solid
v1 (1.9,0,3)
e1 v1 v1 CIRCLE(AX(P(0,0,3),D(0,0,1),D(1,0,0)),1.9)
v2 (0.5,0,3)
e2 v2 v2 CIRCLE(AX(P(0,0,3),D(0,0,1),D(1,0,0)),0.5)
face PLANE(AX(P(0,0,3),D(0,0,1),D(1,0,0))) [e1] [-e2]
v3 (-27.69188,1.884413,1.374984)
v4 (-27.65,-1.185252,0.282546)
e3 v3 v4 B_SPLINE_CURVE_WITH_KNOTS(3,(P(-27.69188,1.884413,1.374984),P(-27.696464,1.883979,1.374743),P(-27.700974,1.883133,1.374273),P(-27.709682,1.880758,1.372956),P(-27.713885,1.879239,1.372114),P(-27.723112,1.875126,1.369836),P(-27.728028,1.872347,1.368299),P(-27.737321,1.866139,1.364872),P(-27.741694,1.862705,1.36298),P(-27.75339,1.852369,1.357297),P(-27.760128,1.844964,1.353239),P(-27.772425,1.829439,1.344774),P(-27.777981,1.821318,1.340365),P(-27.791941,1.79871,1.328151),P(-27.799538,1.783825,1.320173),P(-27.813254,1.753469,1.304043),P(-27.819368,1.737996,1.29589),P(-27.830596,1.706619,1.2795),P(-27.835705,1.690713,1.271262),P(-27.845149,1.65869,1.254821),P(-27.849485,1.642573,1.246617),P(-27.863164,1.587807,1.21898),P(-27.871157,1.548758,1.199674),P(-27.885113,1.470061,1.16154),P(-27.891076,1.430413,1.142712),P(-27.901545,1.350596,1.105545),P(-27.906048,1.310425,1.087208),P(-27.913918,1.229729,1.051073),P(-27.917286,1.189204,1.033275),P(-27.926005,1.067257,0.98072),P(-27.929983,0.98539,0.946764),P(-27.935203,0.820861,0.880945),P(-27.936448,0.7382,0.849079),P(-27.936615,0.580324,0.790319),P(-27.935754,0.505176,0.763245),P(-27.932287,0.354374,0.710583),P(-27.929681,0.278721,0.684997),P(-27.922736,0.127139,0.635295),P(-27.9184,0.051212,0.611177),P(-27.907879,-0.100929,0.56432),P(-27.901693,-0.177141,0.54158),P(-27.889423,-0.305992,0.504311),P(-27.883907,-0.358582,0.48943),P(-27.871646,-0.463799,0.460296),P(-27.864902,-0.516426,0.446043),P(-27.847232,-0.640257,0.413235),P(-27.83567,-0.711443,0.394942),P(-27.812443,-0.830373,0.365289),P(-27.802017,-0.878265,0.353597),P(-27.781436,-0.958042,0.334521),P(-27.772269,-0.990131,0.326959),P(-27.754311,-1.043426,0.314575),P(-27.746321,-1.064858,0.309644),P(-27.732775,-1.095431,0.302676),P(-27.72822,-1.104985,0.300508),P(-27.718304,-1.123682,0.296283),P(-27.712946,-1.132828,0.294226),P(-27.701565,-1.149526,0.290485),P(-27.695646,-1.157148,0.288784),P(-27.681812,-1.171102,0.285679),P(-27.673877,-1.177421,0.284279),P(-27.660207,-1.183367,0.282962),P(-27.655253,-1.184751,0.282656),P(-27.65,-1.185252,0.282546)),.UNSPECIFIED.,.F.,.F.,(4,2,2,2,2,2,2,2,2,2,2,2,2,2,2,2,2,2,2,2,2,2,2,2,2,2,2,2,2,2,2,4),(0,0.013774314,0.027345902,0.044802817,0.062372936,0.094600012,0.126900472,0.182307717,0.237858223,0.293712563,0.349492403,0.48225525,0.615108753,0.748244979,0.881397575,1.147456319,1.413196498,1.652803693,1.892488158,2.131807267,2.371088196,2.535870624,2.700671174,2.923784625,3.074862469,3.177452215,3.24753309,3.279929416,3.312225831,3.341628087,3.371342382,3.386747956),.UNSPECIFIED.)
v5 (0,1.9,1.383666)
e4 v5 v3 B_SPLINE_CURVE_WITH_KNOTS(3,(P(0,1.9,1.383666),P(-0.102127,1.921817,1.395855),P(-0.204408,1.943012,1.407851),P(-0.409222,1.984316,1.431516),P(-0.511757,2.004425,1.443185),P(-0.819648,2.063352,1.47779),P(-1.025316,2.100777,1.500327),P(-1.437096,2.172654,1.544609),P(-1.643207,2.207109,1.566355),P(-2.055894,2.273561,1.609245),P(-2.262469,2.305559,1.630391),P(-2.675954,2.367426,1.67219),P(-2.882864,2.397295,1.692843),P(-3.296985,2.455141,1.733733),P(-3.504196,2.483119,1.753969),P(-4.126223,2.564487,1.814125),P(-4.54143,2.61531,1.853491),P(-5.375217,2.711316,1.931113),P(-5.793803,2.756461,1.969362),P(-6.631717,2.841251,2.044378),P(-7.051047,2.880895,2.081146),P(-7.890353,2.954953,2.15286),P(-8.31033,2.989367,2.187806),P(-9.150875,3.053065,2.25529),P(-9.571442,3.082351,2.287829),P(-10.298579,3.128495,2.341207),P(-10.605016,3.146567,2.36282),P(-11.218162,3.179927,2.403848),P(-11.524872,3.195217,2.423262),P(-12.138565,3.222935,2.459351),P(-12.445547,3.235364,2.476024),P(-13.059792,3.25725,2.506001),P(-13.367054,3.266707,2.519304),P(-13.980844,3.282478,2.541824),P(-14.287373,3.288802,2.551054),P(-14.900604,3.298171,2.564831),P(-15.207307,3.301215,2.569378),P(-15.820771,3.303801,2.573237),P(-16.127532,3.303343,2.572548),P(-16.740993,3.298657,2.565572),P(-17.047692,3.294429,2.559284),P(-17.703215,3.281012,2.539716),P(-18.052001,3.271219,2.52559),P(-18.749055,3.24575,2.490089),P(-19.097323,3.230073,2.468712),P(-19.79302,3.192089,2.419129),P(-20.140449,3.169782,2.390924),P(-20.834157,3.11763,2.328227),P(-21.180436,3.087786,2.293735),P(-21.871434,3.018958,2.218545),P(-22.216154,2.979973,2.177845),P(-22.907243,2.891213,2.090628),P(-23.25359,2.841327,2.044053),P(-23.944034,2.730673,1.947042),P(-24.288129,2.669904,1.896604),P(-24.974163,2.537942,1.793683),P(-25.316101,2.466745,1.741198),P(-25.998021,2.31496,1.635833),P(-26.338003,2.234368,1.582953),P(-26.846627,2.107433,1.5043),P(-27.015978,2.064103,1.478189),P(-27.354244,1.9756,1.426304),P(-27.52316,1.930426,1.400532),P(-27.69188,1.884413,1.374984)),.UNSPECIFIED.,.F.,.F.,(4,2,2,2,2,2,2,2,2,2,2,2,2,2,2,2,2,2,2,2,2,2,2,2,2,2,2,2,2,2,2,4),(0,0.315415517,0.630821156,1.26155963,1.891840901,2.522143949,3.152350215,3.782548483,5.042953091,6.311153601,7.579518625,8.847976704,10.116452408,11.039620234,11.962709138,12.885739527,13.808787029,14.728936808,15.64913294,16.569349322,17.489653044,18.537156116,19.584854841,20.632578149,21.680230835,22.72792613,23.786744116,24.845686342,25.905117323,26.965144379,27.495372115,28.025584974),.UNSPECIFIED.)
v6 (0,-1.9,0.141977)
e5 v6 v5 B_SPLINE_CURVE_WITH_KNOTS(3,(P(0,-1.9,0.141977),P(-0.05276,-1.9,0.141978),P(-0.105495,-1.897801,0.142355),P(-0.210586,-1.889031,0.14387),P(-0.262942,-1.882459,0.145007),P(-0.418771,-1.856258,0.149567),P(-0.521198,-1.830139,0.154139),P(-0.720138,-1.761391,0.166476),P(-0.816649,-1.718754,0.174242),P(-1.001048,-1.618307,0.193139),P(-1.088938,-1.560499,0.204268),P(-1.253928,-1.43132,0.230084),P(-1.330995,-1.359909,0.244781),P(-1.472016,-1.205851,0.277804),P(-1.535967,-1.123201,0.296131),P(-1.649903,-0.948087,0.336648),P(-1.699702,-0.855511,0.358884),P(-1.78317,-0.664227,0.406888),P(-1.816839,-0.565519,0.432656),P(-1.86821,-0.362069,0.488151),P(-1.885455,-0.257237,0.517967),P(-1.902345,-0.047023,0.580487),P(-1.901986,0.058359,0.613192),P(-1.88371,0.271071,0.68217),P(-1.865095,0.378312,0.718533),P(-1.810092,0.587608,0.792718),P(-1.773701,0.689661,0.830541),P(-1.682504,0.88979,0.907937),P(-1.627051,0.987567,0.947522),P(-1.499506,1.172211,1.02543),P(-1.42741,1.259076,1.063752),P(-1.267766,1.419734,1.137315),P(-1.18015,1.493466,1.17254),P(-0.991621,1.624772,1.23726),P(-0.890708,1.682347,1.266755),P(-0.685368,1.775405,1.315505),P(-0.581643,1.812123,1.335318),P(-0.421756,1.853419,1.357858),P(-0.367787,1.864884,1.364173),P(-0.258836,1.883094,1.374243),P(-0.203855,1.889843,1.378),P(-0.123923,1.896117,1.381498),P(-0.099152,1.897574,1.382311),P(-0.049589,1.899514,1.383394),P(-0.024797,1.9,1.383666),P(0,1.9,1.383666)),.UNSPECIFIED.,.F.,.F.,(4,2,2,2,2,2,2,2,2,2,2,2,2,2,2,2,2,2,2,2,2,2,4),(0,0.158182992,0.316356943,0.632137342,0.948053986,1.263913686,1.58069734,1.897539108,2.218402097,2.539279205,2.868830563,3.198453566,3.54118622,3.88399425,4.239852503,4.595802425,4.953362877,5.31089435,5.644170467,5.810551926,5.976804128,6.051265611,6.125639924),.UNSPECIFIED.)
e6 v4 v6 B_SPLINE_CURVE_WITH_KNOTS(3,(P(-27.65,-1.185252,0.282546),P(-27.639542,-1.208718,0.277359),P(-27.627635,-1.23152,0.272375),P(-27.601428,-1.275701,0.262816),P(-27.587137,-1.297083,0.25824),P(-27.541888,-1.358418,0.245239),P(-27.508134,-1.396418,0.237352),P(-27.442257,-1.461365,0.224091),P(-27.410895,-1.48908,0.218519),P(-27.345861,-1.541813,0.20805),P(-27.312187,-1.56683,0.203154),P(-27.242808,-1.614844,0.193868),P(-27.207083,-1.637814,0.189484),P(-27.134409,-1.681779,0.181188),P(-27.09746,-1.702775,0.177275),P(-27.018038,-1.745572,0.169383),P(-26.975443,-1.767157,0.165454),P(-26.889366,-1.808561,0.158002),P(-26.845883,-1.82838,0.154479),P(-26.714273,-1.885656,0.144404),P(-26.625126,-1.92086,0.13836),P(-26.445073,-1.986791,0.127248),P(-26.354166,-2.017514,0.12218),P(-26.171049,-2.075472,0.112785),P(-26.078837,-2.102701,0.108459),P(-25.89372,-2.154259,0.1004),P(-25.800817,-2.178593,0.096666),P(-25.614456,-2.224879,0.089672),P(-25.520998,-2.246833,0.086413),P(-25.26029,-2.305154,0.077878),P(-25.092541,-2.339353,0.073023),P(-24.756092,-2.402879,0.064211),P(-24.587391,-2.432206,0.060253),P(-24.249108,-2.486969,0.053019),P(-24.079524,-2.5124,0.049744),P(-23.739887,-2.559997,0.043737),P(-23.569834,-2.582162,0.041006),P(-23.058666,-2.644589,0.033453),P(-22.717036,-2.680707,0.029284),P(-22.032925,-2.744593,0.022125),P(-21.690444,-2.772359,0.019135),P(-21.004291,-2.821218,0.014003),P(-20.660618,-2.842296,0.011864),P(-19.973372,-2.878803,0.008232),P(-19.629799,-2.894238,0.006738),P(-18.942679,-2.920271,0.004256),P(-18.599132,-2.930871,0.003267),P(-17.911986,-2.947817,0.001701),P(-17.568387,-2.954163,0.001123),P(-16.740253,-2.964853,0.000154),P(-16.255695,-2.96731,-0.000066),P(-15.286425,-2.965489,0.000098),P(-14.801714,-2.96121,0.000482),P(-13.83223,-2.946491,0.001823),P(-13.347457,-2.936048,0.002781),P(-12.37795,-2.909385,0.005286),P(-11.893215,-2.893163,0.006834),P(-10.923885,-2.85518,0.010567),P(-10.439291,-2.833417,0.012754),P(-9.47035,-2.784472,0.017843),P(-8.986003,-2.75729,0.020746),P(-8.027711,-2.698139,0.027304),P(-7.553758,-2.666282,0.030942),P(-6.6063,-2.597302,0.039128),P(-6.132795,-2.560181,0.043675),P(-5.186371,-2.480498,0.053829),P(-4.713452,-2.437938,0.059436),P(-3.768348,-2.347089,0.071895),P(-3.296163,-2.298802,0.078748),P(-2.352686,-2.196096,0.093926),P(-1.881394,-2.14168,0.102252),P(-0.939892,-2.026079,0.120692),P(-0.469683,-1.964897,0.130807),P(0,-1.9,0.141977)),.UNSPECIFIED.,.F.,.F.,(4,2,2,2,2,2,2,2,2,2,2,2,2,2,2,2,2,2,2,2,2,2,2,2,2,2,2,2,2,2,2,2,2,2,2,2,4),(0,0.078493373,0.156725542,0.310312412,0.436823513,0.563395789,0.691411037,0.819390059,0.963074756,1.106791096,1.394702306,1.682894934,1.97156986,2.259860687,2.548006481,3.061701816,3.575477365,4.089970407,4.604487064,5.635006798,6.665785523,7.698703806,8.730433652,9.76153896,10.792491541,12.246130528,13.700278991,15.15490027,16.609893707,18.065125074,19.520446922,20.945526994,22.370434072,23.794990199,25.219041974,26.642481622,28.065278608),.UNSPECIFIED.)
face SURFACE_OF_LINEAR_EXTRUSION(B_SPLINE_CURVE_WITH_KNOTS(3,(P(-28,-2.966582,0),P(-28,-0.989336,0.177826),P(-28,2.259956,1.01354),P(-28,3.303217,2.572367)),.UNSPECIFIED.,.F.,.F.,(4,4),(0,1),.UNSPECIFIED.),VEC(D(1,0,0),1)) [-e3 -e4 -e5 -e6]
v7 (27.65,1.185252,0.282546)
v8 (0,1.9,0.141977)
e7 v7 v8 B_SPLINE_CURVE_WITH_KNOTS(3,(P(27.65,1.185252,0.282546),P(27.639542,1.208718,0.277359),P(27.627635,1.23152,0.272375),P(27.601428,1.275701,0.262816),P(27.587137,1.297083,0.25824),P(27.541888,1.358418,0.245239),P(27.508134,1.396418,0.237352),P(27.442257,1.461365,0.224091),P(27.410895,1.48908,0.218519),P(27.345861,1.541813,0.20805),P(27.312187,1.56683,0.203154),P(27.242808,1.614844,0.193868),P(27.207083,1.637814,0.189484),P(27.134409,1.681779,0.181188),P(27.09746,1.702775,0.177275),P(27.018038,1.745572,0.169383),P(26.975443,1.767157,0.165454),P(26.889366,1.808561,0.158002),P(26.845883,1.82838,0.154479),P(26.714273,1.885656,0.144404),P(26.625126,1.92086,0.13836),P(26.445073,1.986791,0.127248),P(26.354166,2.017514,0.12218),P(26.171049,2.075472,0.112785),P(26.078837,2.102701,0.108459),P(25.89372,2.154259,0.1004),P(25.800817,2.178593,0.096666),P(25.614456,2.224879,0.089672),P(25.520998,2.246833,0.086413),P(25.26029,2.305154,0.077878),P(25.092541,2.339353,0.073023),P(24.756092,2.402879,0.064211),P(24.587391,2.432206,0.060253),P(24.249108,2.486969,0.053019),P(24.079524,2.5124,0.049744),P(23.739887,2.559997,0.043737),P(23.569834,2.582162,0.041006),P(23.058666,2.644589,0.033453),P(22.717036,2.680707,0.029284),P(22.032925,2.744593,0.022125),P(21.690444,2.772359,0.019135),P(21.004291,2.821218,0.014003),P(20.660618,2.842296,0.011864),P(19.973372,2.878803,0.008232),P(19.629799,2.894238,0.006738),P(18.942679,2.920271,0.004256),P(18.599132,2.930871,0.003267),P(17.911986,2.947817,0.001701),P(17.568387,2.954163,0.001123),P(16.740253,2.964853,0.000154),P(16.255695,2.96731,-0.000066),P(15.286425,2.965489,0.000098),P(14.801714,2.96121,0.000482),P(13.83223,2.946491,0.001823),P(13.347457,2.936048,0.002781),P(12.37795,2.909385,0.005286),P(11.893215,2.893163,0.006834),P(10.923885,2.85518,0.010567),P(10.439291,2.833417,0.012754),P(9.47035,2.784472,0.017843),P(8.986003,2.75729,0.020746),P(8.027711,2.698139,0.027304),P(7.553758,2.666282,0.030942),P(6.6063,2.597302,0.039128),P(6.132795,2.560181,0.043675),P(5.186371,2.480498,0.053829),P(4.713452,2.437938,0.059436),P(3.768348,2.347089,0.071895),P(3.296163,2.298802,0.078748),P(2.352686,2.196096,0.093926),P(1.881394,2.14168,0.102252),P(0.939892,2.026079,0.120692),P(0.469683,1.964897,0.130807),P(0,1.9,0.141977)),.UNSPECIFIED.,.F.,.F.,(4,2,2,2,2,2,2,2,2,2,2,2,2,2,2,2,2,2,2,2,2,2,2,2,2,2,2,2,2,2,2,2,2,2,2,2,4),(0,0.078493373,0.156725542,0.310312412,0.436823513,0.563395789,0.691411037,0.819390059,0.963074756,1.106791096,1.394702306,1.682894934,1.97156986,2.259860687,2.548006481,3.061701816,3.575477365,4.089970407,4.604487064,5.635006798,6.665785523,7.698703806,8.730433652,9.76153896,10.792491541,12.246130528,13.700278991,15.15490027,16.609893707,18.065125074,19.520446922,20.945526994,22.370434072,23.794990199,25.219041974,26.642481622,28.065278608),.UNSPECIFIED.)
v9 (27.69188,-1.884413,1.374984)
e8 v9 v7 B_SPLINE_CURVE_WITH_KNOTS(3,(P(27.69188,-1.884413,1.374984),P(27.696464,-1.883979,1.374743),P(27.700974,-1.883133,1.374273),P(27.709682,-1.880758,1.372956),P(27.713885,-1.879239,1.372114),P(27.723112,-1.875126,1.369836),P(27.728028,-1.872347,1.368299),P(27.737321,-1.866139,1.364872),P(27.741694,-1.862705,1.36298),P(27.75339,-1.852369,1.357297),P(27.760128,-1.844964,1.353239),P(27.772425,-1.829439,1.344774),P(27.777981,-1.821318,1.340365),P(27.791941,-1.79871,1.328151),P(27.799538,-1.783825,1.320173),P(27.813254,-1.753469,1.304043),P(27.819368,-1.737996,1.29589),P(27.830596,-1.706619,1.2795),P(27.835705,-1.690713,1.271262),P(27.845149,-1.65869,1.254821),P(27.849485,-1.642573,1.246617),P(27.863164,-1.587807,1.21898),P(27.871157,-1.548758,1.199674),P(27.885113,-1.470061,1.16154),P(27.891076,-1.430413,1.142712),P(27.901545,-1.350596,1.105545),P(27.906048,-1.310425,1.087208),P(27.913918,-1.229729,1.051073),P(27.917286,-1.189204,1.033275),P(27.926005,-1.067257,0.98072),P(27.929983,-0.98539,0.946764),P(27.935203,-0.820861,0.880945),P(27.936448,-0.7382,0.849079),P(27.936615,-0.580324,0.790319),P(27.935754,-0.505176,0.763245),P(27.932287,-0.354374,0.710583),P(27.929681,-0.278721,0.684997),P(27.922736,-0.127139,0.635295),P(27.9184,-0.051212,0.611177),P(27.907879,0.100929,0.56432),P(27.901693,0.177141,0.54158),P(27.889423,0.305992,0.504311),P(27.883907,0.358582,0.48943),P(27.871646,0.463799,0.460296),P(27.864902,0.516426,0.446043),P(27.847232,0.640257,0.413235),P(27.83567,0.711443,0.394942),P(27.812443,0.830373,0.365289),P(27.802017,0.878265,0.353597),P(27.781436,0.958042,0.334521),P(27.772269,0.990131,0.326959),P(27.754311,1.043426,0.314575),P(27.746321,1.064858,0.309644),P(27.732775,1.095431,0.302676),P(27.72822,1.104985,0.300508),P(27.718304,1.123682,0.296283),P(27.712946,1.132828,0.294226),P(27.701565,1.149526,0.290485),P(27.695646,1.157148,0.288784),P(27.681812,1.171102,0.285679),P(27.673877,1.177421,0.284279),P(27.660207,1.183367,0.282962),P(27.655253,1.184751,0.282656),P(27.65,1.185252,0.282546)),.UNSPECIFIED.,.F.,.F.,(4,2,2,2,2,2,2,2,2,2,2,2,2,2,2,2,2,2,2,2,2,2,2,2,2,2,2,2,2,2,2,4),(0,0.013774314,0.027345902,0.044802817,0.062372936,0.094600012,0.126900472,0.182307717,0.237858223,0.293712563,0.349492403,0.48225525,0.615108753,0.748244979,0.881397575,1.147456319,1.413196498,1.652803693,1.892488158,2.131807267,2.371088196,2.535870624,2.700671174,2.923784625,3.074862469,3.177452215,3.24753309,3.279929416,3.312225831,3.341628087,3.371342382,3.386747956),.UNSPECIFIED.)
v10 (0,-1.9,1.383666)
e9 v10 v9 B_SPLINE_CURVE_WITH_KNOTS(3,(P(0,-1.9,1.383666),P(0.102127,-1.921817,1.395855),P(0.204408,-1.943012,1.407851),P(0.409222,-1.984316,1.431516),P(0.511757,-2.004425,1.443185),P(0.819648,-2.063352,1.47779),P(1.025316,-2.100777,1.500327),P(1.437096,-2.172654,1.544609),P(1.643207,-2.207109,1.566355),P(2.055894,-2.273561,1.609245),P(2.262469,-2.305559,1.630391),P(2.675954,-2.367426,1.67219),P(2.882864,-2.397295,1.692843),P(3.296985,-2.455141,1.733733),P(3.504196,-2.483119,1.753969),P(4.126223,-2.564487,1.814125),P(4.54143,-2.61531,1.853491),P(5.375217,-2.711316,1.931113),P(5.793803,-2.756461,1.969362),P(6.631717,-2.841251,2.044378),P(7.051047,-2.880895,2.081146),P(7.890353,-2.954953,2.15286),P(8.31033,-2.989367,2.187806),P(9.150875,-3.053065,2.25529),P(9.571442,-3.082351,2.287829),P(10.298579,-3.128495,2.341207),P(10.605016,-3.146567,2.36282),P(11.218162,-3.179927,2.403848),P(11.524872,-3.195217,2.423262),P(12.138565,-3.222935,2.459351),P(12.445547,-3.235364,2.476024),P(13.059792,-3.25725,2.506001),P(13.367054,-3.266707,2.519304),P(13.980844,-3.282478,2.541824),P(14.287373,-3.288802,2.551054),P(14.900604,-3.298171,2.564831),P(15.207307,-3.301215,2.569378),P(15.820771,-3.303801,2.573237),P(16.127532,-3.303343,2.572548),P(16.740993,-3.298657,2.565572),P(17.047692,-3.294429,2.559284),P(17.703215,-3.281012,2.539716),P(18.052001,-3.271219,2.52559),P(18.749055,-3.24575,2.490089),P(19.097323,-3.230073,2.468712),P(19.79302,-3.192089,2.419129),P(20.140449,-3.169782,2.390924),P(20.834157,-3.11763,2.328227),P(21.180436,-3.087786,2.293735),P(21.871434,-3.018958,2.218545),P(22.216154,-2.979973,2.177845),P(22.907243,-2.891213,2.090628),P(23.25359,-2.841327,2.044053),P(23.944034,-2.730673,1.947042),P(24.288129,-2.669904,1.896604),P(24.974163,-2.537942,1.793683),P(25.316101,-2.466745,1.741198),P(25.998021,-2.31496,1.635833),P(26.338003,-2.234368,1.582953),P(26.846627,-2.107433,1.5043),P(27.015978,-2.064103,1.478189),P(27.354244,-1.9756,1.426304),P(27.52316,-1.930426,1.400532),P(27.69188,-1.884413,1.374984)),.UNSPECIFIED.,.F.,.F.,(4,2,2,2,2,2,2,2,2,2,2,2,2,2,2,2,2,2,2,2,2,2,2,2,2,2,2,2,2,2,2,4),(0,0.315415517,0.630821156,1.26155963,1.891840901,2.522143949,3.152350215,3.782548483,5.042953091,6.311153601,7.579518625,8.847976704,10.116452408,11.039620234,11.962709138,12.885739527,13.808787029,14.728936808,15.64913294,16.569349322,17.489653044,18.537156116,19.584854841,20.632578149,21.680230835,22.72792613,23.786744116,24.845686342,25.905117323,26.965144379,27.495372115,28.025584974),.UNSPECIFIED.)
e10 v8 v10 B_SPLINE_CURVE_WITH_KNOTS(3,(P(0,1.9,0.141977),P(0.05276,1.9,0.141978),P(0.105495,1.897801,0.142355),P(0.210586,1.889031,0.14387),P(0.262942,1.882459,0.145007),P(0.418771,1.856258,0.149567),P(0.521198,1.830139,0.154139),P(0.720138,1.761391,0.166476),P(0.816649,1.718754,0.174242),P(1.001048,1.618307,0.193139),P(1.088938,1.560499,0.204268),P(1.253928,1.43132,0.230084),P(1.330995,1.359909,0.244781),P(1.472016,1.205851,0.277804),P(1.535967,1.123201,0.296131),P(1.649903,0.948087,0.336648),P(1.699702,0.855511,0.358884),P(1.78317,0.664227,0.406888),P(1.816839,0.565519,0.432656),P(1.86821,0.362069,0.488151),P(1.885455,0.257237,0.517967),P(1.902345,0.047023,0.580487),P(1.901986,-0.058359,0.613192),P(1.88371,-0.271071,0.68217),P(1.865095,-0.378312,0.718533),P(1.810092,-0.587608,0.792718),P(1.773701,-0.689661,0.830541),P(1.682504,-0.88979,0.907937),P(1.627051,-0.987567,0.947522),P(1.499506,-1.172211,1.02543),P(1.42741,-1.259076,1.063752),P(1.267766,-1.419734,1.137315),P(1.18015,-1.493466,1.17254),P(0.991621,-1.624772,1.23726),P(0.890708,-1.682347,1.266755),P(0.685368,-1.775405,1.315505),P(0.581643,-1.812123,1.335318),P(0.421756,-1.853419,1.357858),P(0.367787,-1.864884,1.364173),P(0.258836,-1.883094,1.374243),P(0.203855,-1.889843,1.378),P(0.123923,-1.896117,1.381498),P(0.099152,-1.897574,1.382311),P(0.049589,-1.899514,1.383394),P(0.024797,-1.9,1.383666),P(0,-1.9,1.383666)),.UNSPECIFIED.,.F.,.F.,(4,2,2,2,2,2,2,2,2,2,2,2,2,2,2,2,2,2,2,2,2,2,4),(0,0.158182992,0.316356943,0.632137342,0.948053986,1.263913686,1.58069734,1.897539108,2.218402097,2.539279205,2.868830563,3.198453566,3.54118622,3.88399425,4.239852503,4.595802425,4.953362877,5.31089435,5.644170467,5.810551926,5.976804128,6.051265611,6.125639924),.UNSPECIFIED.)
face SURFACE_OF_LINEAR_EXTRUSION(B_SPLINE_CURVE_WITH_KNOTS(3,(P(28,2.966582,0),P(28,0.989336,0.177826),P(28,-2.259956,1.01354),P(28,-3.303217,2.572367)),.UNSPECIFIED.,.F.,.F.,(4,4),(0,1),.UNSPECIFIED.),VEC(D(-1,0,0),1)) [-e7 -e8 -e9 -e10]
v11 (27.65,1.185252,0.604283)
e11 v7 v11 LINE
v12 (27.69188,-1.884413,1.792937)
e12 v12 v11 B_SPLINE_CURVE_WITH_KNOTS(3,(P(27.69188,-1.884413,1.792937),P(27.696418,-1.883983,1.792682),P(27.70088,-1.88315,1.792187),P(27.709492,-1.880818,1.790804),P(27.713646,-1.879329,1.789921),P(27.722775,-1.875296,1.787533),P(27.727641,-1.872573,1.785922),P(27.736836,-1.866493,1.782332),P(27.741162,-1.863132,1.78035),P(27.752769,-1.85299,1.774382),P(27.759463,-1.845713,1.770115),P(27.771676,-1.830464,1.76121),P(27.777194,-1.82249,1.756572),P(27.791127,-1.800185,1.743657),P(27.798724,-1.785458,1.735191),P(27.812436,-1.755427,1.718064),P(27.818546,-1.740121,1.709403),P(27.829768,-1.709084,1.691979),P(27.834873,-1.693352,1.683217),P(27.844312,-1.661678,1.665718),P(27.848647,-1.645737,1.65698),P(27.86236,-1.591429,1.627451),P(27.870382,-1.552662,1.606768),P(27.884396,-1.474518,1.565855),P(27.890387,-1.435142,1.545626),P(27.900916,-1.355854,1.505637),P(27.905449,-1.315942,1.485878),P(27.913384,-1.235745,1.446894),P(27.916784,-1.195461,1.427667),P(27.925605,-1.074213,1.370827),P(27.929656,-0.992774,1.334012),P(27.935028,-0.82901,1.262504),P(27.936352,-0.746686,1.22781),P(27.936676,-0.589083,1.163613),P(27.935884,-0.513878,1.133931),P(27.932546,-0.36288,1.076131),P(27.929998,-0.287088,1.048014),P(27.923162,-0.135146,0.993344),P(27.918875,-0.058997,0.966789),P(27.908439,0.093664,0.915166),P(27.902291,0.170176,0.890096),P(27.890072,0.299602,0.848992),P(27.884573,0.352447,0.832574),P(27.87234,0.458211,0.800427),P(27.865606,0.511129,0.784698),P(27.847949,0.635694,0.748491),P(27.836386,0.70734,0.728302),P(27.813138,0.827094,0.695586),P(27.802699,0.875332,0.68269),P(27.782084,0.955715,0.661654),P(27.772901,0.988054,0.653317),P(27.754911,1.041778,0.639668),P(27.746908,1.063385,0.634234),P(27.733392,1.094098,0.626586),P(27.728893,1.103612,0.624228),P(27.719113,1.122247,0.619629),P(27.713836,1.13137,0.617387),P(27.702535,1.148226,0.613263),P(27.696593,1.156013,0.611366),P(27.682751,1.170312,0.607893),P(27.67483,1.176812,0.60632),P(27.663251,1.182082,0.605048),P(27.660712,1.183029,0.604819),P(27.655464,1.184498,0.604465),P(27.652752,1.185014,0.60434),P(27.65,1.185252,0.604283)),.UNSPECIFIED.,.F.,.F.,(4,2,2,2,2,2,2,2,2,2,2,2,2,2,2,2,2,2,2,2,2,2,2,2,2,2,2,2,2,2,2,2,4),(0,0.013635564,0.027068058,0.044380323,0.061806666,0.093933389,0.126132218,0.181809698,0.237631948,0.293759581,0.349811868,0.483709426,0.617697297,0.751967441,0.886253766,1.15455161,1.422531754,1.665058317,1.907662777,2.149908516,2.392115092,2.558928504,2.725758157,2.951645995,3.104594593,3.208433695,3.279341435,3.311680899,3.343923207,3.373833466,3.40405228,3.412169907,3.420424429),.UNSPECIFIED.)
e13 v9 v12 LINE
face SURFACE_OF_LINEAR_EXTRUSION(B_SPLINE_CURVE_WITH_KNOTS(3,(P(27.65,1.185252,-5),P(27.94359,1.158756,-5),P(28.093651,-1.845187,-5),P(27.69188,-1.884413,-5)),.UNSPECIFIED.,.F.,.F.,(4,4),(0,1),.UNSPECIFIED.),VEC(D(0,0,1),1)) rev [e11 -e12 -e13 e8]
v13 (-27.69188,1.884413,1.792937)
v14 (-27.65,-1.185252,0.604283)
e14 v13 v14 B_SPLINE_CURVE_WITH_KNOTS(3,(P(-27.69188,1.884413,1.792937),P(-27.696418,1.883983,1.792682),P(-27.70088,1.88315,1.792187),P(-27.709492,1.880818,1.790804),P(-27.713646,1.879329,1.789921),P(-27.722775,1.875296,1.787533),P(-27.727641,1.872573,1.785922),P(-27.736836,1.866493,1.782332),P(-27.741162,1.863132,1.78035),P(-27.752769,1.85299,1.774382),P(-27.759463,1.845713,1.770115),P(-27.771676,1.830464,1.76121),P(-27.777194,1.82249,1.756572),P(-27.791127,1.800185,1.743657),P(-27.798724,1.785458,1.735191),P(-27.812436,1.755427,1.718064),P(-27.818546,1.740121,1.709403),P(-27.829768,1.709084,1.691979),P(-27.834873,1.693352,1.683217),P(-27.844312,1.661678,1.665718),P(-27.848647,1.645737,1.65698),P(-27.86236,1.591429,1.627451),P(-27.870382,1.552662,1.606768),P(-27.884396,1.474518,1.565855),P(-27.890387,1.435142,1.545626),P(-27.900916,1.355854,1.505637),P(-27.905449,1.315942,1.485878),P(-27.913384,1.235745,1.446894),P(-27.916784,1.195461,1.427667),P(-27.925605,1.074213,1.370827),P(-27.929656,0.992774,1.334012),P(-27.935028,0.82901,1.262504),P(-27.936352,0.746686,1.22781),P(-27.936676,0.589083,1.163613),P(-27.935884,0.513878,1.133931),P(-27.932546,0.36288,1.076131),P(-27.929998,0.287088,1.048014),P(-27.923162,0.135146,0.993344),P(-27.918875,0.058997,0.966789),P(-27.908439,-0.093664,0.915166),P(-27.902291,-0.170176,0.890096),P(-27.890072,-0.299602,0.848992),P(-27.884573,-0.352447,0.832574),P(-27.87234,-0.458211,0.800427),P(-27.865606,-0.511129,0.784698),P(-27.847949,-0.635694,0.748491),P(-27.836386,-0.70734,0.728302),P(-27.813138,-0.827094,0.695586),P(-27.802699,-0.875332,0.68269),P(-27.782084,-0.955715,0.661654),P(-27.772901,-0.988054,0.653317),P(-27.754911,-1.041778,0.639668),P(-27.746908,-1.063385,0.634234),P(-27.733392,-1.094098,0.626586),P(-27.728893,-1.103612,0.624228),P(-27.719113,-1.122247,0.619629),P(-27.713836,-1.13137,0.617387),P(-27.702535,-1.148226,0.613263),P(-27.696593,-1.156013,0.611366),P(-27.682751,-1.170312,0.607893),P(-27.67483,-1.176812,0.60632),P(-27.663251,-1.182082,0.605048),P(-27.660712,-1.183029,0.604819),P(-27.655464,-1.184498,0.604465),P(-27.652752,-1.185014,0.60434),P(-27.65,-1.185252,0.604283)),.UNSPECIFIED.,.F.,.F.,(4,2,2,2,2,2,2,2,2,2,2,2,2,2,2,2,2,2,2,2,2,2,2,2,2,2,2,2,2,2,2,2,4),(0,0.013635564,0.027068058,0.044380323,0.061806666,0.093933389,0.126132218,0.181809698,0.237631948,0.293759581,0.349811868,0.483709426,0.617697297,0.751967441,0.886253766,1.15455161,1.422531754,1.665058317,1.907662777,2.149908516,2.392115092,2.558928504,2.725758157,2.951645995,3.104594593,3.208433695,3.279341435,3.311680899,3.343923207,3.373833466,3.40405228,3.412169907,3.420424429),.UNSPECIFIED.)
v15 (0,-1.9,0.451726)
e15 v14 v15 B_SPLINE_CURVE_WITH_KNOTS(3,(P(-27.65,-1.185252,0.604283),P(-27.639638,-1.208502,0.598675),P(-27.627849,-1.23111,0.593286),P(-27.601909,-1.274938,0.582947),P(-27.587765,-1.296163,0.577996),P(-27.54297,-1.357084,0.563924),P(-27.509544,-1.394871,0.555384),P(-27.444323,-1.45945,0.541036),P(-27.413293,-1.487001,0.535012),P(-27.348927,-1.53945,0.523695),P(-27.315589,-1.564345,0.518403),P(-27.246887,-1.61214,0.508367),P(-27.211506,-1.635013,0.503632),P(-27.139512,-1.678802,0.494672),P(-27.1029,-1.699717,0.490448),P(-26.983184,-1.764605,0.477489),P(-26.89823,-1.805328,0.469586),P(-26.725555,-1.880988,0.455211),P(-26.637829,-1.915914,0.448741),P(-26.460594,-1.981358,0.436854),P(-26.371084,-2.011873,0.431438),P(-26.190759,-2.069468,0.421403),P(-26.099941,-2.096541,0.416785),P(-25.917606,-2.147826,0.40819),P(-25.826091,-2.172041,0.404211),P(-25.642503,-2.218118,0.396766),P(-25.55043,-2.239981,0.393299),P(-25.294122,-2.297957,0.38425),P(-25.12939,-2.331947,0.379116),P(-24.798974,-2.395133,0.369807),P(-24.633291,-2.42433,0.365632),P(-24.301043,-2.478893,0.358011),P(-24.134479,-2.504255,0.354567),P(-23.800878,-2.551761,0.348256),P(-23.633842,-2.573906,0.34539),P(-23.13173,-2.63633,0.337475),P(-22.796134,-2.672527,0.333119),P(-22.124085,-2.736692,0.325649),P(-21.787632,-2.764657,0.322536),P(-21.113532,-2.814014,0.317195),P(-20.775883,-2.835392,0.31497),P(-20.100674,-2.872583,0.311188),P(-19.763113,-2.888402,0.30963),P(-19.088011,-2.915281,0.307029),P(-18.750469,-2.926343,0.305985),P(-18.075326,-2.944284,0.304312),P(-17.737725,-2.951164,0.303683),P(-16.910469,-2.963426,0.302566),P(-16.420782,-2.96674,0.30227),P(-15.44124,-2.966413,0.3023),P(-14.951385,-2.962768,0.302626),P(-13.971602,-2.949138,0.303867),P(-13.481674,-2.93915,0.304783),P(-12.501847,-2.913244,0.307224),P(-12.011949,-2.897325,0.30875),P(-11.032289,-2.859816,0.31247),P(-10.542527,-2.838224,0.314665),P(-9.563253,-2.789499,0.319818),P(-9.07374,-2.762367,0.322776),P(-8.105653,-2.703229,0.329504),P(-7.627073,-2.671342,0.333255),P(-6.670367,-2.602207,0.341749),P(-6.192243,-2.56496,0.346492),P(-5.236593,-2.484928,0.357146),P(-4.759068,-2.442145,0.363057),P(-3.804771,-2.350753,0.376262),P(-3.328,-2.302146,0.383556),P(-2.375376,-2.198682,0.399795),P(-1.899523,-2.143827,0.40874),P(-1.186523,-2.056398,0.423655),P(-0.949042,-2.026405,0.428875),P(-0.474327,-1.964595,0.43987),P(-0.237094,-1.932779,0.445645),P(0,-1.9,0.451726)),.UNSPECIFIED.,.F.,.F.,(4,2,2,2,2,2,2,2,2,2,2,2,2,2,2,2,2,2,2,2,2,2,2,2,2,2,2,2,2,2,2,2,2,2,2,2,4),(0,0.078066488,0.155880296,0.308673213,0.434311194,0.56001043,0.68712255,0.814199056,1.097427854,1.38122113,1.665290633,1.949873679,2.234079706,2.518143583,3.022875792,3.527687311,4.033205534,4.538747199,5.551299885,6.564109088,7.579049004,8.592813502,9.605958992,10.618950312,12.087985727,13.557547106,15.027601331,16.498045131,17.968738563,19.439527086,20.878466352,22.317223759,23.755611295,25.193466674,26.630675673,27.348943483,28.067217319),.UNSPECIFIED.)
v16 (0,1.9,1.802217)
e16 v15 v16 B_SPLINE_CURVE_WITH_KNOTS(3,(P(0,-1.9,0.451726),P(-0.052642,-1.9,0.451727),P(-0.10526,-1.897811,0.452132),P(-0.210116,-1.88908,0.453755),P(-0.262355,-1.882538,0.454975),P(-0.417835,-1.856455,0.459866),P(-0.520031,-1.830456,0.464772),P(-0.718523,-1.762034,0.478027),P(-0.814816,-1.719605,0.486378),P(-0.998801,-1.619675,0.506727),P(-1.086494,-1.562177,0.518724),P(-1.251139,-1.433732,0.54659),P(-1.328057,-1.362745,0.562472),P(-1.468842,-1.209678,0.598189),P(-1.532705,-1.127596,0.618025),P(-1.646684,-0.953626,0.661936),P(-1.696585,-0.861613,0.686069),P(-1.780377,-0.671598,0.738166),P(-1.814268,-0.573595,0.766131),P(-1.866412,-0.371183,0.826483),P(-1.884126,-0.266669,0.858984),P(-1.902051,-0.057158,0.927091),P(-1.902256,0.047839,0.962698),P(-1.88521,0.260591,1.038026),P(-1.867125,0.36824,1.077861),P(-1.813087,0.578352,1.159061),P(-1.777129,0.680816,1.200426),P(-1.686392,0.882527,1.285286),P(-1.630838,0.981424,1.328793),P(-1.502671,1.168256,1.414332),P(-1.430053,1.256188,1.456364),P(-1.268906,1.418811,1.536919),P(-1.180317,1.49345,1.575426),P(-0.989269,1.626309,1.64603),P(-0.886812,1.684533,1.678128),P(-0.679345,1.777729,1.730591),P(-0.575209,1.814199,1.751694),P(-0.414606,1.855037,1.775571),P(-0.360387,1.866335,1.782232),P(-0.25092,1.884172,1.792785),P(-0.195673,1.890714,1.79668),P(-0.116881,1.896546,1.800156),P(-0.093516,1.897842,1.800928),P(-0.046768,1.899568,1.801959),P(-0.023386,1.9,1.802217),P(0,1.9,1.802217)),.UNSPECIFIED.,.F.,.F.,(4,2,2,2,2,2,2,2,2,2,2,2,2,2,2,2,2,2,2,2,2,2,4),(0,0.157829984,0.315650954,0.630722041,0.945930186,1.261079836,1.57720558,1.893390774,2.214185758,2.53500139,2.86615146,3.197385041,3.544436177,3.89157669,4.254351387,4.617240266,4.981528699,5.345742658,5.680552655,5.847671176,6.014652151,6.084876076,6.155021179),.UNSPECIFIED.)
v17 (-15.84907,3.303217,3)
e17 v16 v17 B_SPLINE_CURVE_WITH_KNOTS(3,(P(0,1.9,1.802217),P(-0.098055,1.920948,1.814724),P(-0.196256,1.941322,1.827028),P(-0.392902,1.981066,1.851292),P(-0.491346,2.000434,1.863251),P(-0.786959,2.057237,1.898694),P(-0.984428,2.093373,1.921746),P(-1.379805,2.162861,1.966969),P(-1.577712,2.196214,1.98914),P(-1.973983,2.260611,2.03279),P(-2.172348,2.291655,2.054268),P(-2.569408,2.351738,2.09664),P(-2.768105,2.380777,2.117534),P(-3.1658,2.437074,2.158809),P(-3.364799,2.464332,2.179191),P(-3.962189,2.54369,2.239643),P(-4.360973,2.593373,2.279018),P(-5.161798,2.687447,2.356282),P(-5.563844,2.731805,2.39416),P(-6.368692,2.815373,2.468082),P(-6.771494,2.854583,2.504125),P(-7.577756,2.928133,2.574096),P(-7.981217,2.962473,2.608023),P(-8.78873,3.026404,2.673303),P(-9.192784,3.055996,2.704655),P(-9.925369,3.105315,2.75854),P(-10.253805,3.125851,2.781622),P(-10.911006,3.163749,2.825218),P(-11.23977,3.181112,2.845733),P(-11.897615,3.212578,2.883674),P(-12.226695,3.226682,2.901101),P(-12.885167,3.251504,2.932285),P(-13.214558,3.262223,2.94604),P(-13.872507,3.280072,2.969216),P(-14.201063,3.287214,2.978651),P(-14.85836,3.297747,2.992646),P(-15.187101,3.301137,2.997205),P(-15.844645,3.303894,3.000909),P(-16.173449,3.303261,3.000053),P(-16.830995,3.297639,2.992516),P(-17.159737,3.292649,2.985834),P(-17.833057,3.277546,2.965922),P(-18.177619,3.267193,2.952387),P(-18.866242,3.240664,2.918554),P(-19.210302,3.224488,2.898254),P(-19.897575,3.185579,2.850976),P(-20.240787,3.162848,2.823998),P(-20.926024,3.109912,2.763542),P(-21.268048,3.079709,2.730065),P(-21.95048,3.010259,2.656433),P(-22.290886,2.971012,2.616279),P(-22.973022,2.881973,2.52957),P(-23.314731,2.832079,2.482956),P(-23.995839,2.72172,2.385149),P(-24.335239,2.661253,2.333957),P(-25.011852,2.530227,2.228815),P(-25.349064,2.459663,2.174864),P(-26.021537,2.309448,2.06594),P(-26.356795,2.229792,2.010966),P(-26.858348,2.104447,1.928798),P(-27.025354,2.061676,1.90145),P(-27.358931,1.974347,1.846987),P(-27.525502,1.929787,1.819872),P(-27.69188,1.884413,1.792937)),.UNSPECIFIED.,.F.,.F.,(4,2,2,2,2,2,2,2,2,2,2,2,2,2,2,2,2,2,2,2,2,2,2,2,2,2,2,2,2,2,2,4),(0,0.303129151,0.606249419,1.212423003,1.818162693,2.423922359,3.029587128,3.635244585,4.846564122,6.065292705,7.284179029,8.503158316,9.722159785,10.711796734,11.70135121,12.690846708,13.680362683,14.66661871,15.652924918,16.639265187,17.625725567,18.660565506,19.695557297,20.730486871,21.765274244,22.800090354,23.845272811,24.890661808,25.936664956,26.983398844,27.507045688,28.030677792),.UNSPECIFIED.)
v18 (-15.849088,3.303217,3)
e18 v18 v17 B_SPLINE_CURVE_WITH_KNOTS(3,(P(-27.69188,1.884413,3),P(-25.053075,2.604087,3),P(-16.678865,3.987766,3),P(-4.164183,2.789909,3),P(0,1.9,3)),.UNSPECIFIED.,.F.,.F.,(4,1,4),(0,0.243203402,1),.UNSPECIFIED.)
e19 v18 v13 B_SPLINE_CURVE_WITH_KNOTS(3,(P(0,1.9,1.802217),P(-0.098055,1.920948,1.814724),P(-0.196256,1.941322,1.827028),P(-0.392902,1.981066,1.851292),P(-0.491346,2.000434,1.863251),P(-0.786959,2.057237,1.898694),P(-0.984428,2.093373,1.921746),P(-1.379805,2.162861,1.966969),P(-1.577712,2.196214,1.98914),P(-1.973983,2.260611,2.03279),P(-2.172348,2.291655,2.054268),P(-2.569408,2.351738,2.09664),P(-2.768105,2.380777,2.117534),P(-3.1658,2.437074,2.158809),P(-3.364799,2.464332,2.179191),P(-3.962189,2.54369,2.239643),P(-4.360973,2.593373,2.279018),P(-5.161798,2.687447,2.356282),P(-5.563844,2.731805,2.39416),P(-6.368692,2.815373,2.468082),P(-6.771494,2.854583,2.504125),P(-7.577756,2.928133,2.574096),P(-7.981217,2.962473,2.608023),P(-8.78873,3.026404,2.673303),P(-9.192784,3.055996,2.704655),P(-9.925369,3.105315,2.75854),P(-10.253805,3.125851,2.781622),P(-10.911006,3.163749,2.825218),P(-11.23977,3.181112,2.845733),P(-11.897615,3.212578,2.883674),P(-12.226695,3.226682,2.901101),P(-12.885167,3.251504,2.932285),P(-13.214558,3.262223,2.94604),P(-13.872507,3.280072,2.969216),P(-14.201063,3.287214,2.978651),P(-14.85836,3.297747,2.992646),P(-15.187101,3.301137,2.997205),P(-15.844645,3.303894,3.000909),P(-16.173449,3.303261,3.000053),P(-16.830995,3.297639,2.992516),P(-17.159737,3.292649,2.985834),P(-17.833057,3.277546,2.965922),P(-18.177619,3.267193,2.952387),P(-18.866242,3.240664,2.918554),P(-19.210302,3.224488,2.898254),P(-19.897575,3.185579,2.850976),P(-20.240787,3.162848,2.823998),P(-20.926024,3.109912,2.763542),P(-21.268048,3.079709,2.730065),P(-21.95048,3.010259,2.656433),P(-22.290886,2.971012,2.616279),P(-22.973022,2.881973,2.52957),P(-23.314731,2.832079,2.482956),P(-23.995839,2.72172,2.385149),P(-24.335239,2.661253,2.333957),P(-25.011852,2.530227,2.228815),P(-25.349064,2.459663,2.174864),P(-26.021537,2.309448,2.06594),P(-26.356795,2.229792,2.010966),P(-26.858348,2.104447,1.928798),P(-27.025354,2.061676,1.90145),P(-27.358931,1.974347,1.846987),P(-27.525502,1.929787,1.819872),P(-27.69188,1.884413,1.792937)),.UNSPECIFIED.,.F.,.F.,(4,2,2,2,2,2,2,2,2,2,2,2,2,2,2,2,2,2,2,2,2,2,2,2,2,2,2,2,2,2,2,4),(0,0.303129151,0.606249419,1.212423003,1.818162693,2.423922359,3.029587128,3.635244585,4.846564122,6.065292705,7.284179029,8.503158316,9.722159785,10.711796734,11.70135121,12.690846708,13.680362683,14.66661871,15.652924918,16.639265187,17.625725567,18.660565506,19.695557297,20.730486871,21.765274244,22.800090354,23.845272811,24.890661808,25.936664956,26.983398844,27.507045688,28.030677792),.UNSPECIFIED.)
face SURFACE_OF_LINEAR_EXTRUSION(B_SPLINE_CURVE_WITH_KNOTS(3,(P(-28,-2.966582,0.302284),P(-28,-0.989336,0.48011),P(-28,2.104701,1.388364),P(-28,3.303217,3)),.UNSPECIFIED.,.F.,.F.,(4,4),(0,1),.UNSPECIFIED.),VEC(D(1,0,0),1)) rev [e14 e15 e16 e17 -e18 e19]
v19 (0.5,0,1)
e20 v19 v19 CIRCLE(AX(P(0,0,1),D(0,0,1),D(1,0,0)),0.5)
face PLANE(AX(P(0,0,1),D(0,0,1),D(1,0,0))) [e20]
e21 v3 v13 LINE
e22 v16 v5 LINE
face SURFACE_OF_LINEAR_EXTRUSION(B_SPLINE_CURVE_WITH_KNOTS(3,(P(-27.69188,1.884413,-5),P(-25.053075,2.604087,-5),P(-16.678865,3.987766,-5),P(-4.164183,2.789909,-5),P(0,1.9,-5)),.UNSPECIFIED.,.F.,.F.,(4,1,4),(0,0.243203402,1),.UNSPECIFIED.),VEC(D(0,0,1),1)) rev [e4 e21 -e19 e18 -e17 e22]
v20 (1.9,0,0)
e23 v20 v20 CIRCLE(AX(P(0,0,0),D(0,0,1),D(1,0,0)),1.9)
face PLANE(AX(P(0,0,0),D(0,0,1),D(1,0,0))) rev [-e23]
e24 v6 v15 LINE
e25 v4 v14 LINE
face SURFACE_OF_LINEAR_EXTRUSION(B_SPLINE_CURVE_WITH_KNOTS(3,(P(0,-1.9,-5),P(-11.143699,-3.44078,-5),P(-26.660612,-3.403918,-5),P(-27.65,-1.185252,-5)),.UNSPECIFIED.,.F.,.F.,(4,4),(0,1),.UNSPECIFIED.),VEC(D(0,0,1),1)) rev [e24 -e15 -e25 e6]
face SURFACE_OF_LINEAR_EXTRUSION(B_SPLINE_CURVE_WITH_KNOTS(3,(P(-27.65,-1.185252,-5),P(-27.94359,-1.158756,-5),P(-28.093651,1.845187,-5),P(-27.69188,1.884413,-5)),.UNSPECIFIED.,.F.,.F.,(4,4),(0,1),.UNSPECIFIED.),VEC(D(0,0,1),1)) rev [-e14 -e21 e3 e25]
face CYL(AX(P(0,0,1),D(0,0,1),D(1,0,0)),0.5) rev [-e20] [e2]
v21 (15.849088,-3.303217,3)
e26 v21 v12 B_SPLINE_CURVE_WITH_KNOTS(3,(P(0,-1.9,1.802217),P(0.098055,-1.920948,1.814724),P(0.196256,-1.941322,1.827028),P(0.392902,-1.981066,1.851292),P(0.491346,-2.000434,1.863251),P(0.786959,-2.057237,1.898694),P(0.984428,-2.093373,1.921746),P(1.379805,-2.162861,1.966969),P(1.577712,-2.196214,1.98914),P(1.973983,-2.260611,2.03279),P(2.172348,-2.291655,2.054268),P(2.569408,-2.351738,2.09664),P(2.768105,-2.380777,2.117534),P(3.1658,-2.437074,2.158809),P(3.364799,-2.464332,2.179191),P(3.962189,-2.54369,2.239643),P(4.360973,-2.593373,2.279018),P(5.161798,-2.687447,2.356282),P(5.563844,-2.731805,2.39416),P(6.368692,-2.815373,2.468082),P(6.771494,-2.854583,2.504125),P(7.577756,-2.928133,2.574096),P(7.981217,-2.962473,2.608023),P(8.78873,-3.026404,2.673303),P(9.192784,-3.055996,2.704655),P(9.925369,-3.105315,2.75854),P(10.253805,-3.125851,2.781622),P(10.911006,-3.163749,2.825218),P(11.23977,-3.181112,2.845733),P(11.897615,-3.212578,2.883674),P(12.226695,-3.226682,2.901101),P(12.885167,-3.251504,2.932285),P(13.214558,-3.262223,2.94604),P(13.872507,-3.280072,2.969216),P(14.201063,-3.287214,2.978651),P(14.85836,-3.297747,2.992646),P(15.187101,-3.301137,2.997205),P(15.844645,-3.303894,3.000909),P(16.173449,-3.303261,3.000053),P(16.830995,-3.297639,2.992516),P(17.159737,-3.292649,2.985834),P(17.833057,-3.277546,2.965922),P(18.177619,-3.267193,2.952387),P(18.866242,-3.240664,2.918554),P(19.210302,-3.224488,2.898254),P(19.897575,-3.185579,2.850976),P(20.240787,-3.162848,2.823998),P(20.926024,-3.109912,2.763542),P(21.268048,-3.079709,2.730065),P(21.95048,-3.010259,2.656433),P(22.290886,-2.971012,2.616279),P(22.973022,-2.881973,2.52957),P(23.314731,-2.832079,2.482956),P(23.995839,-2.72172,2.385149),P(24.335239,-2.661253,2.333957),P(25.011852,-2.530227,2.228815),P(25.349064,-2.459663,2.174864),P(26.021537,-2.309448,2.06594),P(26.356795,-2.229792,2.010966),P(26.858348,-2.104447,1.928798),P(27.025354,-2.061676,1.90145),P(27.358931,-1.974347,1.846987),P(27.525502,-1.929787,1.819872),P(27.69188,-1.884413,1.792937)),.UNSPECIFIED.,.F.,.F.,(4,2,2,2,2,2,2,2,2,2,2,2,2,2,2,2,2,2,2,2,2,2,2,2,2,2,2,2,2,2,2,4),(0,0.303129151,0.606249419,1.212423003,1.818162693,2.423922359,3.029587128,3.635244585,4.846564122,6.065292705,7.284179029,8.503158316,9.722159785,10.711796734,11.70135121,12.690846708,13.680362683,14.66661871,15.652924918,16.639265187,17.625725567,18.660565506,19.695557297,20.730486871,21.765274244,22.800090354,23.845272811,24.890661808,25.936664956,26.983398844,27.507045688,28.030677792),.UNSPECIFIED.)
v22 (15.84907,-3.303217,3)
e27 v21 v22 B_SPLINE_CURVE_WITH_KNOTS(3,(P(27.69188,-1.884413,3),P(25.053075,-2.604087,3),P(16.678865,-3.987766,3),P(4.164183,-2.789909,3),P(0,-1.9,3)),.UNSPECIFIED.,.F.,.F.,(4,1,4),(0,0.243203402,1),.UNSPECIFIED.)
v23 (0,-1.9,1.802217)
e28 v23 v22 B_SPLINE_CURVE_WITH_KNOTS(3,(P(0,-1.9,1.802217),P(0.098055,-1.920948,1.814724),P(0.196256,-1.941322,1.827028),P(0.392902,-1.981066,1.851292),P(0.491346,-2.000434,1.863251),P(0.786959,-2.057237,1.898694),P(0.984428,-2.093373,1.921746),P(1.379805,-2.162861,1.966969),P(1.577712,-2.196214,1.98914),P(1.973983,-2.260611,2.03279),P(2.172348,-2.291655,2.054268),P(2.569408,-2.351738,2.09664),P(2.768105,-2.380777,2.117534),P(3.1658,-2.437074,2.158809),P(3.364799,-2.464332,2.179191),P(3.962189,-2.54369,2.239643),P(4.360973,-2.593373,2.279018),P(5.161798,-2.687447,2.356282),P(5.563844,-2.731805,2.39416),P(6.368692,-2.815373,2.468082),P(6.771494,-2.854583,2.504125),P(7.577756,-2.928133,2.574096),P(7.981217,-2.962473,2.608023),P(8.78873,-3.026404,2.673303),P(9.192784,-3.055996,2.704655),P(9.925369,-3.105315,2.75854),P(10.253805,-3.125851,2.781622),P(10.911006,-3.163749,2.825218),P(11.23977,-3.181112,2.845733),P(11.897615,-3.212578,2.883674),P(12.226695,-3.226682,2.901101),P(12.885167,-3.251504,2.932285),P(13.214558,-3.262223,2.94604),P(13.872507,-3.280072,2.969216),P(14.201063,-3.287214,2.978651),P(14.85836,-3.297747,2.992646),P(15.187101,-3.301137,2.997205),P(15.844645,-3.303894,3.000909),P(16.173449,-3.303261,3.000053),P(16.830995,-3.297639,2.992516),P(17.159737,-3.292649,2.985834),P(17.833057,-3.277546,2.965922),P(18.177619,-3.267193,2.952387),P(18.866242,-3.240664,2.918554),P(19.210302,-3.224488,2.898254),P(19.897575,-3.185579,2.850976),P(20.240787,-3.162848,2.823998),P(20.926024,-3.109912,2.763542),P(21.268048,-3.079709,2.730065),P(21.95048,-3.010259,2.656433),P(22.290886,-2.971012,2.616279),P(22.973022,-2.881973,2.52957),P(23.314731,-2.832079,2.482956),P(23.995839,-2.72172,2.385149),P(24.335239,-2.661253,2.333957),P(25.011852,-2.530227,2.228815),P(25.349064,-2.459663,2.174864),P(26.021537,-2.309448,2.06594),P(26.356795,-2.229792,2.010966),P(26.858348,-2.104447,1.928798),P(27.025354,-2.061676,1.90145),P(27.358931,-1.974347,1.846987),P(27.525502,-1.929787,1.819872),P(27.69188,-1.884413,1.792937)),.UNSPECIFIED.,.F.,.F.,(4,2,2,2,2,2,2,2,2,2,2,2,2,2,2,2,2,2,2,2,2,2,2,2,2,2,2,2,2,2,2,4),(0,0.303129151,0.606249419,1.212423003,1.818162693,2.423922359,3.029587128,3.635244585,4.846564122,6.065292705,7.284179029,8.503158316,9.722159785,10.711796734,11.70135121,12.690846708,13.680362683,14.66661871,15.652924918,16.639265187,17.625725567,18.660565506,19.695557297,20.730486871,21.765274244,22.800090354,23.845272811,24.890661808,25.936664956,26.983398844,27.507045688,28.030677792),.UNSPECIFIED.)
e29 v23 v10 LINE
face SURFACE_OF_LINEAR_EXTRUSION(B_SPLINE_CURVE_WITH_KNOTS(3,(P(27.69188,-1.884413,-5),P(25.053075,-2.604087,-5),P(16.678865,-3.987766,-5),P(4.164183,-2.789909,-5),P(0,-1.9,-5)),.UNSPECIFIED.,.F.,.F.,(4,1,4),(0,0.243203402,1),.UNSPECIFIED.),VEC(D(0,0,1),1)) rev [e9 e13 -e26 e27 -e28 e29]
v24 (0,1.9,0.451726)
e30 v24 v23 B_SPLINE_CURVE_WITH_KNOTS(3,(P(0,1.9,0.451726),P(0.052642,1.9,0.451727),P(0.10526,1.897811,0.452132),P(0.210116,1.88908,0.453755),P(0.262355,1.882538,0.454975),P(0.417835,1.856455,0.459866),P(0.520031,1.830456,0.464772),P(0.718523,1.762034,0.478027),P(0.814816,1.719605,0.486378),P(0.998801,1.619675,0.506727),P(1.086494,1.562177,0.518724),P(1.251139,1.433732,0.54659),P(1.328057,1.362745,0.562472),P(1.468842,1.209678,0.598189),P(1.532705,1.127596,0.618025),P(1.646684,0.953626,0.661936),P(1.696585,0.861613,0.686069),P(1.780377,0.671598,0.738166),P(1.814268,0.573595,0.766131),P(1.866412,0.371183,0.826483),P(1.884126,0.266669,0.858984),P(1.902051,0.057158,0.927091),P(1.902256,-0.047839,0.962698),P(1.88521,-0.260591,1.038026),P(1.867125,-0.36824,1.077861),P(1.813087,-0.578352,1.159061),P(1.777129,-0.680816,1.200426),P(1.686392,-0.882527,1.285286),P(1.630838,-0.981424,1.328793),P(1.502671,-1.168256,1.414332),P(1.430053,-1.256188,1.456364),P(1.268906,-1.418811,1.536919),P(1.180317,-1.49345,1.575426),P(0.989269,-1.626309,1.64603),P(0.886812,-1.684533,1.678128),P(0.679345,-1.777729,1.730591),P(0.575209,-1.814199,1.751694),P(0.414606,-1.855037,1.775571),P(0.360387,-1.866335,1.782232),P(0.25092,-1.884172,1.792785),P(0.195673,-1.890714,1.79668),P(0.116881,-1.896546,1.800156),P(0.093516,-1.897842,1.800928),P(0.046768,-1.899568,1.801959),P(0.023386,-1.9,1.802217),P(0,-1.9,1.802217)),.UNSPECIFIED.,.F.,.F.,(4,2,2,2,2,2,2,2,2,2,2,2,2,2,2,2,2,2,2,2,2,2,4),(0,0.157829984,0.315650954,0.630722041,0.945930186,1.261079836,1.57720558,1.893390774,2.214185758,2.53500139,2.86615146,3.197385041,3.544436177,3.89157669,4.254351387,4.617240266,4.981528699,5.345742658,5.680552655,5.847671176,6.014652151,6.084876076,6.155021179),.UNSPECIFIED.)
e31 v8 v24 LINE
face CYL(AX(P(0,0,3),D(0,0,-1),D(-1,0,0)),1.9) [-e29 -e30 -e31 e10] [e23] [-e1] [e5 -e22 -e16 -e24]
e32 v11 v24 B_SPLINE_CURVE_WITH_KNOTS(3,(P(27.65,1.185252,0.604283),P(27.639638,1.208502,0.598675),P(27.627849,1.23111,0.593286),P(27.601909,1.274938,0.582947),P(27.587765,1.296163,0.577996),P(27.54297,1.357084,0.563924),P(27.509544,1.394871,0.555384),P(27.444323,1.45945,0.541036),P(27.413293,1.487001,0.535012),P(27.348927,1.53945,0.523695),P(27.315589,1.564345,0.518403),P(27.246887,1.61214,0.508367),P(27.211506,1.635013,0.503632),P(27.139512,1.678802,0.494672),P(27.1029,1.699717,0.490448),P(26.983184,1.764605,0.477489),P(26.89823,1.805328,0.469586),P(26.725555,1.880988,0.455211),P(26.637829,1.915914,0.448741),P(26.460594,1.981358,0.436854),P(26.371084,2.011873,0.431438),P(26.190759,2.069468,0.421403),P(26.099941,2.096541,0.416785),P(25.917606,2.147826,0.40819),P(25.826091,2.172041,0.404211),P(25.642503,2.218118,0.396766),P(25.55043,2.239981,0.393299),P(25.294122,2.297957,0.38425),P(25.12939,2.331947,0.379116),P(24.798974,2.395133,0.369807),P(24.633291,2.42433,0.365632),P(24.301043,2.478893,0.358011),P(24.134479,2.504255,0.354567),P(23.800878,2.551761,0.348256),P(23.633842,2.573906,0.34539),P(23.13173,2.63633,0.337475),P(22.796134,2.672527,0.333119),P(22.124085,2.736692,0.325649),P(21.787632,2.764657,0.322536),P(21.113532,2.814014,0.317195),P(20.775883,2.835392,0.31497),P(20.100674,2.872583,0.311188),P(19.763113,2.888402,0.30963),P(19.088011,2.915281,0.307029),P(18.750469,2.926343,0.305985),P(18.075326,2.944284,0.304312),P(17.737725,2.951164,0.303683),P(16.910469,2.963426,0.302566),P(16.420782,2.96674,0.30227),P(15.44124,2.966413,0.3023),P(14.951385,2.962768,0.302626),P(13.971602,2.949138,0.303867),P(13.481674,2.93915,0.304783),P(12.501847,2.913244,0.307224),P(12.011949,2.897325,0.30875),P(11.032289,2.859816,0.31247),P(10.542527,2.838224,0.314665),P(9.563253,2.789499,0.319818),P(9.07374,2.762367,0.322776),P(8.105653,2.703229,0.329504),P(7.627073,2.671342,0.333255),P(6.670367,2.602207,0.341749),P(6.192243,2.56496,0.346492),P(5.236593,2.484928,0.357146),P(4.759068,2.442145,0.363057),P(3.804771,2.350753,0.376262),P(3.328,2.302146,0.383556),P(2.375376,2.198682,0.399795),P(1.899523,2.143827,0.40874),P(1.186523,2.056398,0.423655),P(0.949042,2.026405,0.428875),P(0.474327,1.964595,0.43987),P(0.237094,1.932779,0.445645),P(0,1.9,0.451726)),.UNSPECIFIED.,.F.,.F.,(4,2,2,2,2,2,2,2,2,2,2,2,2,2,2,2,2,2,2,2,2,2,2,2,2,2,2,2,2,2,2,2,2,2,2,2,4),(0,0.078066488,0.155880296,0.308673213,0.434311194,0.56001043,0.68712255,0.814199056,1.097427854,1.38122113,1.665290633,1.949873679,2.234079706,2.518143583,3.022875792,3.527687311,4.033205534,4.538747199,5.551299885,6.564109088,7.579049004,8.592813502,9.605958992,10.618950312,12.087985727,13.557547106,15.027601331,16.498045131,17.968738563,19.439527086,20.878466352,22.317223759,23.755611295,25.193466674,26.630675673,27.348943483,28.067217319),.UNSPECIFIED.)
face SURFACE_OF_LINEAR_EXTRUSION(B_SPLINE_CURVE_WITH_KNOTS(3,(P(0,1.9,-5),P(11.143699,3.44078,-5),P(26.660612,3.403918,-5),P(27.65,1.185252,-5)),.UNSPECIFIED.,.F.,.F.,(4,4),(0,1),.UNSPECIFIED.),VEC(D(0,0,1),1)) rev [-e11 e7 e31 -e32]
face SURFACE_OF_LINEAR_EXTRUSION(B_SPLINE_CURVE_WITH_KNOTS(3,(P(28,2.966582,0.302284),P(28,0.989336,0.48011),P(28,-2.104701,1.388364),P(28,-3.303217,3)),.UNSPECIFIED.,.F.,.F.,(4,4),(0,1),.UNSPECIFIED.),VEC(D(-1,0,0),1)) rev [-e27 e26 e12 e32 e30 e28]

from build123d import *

# Parameters (mm, degrees)
ESBO_O1_R                  = 1.9
RESSALTO_EXTRUS_O1_DEPTH   = 3
RESSALTO_EXTRUS_O3_DEPTH   = 28
CORTE_EXTRUS_O_FINA4_START = -3.000000318
CORTE_EXTRUS_O_FINA4_DEPTH = 3.000000318
PADR_OCIRCULAR1_COUNT      = 2
ESBO_O5_R                  = 0.5
CORTE_EXTRUS_O5_DEPTH      = 2


# Read off the part's stored shape, not the designer's step: Corte-Extrusão-Fina4
with BuildPart() as part:
    # Esboço1 → Ressalto-extrusão1 (new body)
    with BuildSketch(Plane.XY):
        Circle(ESBO_O1_R)
    extrude(amount=RESSALTO_EXTRUS_O1_DEPTH)

    # Esboço4 → Ressalto-extrusão3 (add)
    with BuildSketch(Plane(origin=(0, 0, 0), x_dir=(0, 0, -1), z_dir=(1, 0, 0))):
        with BuildLine():
            Line((0, 2.966582109), (-0.302284292, 2.966582109))
            add(Edge.make_bspline(
                [(-0.302284292, 2.966582109), (-0.48011033, 0.989335618), (-1.388364091, -2.104701367), (-3, -3.303217097)],
                knots=[0, 0, 0, 0, 1, 1, 1, 1], degree=3))
            Line((-3, -3.303217097), (-2.572366731, -3.303217097))
            add(Edge.make_bspline(
                [(0, 2.966582109), (-0.177826038, 0.989335618), (-1.013540392, -2.259955739), (-2.572366731, -3.303217097)],
                knots=[0, 0, 0, 0, 1, 1, 1, 1], degree=3))
        make_face()
    ressalto_extrus_o3 = extrude(amount=RESSALTO_EXTRUS_O3_DEPTH)

    # Corte-Extrusão-Fina4 outline → Corte-Extrusão-Fina4 (cut)
    with BuildSketch(Plane.XY.offset(3).offset(CORTE_EXTRUS_O_FINA4_START)):
        with BuildLine():
            add(Edge.make_bspline(
                [(15.965244027, 2.966582109), (22.160101016, 2.966582102), (27.105451106, 2.406382612), (27.65, 1.185252223)],
                knots=[0.449610583, 0.449610583, 0.449610583, 0.449610583, 1, 1, 1, 1], degree=3))
            add(Edge.make_bspline(
                [(27.65, 1.185252223), (27.943589962, 1.15875623), (28.093651275, -1.845186793), (27.691880485, -1.884412653)],
                knots=[0, 0, 0, 0, 1, 1, 1, 1], degree=3))
            add(Edge.make_bspline(
                [(27.691880485, -1.884412653), (25.053075141, -2.604086837), (21.639173149, -3.168169457), (17.53715106, -3.303217097), (15.849087583, -3.303217097)],
                knots=[0, 0, 0, 0, 0.243203402, 0.407668544, 0.407668544, 0.407668544, 0.407668544], degree=3))
            Line((15.849087583, -3.303217097), (28, -3.303217097))
            Line((28, -3.303217097), (28, 2.966582109))
            Line((28, 2.966582109), (15.965244027, 2.966582109))
        make_face()
        with BuildLine():
            add(Edge.make_bspline(
                [(0, 1.9), (5.010325131, 2.59275087), (10.904693859, 2.966582115), (15.965244027, 2.966582109)],
                knots=[0, 0, 0, 0, 0.449610583, 0.449610583, 0.449610583, 0.449610583], degree=3))
            Line((15.965244027, 2.966582109), (0, 2.966582109))
            Line((0, 2.966582109), (0, 1.9))
        make_face()
        with BuildLine():
            Line((0, -3.303217097), (15.849087583, -3.303217097))
            add(Edge.make_bspline(
                [(15.849087583, -3.303217097), (9.769421811, -3.303217097), (3.259233415, -2.59651639), (0, -1.9)],
                knots=[0.407668544, 0.407668544, 0.407668544, 0.407668544, 1, 1, 1, 1], degree=3))
            Line((0, -1.9), (0, -3.303217097))
        make_face()
    corte_extrus_o_fina4 = extrude(amount=CORTE_EXTRUS_O_FINA4_DEPTH, mode=Mode.SUBTRACT)

    # PadrãoCircular1: Ressalto-extrusão3, Corte-Extrusão-Fina4 ×2 about axis
    padr_ocircular1_axis = Axis((0, 0, 3), (0, 0, -1))
    add([ressalto_extrus_o3.rotate(padr_ocircular1_axis, i * 360 / PADR_OCIRCULAR1_COUNT) for i in range(1, PADR_OCIRCULAR1_COUNT)])
    add([corte_extrus_o_fina4.rotate(padr_ocircular1_axis, i * 360 / PADR_OCIRCULAR1_COUNT) for i in range(1, PADR_OCIRCULAR1_COUNT)], mode=Mode.SUBTRACT)

    # Esboço5 → Corte-extrusão5 (cut)
    with BuildSketch(Plane.XY.offset(3)):
        Circle(ESBO_O5_R)
    extrude(amount=-CORTE_EXTRUS_O5_DEPTH, mode=Mode.SUBTRACT)


solid = part.part
